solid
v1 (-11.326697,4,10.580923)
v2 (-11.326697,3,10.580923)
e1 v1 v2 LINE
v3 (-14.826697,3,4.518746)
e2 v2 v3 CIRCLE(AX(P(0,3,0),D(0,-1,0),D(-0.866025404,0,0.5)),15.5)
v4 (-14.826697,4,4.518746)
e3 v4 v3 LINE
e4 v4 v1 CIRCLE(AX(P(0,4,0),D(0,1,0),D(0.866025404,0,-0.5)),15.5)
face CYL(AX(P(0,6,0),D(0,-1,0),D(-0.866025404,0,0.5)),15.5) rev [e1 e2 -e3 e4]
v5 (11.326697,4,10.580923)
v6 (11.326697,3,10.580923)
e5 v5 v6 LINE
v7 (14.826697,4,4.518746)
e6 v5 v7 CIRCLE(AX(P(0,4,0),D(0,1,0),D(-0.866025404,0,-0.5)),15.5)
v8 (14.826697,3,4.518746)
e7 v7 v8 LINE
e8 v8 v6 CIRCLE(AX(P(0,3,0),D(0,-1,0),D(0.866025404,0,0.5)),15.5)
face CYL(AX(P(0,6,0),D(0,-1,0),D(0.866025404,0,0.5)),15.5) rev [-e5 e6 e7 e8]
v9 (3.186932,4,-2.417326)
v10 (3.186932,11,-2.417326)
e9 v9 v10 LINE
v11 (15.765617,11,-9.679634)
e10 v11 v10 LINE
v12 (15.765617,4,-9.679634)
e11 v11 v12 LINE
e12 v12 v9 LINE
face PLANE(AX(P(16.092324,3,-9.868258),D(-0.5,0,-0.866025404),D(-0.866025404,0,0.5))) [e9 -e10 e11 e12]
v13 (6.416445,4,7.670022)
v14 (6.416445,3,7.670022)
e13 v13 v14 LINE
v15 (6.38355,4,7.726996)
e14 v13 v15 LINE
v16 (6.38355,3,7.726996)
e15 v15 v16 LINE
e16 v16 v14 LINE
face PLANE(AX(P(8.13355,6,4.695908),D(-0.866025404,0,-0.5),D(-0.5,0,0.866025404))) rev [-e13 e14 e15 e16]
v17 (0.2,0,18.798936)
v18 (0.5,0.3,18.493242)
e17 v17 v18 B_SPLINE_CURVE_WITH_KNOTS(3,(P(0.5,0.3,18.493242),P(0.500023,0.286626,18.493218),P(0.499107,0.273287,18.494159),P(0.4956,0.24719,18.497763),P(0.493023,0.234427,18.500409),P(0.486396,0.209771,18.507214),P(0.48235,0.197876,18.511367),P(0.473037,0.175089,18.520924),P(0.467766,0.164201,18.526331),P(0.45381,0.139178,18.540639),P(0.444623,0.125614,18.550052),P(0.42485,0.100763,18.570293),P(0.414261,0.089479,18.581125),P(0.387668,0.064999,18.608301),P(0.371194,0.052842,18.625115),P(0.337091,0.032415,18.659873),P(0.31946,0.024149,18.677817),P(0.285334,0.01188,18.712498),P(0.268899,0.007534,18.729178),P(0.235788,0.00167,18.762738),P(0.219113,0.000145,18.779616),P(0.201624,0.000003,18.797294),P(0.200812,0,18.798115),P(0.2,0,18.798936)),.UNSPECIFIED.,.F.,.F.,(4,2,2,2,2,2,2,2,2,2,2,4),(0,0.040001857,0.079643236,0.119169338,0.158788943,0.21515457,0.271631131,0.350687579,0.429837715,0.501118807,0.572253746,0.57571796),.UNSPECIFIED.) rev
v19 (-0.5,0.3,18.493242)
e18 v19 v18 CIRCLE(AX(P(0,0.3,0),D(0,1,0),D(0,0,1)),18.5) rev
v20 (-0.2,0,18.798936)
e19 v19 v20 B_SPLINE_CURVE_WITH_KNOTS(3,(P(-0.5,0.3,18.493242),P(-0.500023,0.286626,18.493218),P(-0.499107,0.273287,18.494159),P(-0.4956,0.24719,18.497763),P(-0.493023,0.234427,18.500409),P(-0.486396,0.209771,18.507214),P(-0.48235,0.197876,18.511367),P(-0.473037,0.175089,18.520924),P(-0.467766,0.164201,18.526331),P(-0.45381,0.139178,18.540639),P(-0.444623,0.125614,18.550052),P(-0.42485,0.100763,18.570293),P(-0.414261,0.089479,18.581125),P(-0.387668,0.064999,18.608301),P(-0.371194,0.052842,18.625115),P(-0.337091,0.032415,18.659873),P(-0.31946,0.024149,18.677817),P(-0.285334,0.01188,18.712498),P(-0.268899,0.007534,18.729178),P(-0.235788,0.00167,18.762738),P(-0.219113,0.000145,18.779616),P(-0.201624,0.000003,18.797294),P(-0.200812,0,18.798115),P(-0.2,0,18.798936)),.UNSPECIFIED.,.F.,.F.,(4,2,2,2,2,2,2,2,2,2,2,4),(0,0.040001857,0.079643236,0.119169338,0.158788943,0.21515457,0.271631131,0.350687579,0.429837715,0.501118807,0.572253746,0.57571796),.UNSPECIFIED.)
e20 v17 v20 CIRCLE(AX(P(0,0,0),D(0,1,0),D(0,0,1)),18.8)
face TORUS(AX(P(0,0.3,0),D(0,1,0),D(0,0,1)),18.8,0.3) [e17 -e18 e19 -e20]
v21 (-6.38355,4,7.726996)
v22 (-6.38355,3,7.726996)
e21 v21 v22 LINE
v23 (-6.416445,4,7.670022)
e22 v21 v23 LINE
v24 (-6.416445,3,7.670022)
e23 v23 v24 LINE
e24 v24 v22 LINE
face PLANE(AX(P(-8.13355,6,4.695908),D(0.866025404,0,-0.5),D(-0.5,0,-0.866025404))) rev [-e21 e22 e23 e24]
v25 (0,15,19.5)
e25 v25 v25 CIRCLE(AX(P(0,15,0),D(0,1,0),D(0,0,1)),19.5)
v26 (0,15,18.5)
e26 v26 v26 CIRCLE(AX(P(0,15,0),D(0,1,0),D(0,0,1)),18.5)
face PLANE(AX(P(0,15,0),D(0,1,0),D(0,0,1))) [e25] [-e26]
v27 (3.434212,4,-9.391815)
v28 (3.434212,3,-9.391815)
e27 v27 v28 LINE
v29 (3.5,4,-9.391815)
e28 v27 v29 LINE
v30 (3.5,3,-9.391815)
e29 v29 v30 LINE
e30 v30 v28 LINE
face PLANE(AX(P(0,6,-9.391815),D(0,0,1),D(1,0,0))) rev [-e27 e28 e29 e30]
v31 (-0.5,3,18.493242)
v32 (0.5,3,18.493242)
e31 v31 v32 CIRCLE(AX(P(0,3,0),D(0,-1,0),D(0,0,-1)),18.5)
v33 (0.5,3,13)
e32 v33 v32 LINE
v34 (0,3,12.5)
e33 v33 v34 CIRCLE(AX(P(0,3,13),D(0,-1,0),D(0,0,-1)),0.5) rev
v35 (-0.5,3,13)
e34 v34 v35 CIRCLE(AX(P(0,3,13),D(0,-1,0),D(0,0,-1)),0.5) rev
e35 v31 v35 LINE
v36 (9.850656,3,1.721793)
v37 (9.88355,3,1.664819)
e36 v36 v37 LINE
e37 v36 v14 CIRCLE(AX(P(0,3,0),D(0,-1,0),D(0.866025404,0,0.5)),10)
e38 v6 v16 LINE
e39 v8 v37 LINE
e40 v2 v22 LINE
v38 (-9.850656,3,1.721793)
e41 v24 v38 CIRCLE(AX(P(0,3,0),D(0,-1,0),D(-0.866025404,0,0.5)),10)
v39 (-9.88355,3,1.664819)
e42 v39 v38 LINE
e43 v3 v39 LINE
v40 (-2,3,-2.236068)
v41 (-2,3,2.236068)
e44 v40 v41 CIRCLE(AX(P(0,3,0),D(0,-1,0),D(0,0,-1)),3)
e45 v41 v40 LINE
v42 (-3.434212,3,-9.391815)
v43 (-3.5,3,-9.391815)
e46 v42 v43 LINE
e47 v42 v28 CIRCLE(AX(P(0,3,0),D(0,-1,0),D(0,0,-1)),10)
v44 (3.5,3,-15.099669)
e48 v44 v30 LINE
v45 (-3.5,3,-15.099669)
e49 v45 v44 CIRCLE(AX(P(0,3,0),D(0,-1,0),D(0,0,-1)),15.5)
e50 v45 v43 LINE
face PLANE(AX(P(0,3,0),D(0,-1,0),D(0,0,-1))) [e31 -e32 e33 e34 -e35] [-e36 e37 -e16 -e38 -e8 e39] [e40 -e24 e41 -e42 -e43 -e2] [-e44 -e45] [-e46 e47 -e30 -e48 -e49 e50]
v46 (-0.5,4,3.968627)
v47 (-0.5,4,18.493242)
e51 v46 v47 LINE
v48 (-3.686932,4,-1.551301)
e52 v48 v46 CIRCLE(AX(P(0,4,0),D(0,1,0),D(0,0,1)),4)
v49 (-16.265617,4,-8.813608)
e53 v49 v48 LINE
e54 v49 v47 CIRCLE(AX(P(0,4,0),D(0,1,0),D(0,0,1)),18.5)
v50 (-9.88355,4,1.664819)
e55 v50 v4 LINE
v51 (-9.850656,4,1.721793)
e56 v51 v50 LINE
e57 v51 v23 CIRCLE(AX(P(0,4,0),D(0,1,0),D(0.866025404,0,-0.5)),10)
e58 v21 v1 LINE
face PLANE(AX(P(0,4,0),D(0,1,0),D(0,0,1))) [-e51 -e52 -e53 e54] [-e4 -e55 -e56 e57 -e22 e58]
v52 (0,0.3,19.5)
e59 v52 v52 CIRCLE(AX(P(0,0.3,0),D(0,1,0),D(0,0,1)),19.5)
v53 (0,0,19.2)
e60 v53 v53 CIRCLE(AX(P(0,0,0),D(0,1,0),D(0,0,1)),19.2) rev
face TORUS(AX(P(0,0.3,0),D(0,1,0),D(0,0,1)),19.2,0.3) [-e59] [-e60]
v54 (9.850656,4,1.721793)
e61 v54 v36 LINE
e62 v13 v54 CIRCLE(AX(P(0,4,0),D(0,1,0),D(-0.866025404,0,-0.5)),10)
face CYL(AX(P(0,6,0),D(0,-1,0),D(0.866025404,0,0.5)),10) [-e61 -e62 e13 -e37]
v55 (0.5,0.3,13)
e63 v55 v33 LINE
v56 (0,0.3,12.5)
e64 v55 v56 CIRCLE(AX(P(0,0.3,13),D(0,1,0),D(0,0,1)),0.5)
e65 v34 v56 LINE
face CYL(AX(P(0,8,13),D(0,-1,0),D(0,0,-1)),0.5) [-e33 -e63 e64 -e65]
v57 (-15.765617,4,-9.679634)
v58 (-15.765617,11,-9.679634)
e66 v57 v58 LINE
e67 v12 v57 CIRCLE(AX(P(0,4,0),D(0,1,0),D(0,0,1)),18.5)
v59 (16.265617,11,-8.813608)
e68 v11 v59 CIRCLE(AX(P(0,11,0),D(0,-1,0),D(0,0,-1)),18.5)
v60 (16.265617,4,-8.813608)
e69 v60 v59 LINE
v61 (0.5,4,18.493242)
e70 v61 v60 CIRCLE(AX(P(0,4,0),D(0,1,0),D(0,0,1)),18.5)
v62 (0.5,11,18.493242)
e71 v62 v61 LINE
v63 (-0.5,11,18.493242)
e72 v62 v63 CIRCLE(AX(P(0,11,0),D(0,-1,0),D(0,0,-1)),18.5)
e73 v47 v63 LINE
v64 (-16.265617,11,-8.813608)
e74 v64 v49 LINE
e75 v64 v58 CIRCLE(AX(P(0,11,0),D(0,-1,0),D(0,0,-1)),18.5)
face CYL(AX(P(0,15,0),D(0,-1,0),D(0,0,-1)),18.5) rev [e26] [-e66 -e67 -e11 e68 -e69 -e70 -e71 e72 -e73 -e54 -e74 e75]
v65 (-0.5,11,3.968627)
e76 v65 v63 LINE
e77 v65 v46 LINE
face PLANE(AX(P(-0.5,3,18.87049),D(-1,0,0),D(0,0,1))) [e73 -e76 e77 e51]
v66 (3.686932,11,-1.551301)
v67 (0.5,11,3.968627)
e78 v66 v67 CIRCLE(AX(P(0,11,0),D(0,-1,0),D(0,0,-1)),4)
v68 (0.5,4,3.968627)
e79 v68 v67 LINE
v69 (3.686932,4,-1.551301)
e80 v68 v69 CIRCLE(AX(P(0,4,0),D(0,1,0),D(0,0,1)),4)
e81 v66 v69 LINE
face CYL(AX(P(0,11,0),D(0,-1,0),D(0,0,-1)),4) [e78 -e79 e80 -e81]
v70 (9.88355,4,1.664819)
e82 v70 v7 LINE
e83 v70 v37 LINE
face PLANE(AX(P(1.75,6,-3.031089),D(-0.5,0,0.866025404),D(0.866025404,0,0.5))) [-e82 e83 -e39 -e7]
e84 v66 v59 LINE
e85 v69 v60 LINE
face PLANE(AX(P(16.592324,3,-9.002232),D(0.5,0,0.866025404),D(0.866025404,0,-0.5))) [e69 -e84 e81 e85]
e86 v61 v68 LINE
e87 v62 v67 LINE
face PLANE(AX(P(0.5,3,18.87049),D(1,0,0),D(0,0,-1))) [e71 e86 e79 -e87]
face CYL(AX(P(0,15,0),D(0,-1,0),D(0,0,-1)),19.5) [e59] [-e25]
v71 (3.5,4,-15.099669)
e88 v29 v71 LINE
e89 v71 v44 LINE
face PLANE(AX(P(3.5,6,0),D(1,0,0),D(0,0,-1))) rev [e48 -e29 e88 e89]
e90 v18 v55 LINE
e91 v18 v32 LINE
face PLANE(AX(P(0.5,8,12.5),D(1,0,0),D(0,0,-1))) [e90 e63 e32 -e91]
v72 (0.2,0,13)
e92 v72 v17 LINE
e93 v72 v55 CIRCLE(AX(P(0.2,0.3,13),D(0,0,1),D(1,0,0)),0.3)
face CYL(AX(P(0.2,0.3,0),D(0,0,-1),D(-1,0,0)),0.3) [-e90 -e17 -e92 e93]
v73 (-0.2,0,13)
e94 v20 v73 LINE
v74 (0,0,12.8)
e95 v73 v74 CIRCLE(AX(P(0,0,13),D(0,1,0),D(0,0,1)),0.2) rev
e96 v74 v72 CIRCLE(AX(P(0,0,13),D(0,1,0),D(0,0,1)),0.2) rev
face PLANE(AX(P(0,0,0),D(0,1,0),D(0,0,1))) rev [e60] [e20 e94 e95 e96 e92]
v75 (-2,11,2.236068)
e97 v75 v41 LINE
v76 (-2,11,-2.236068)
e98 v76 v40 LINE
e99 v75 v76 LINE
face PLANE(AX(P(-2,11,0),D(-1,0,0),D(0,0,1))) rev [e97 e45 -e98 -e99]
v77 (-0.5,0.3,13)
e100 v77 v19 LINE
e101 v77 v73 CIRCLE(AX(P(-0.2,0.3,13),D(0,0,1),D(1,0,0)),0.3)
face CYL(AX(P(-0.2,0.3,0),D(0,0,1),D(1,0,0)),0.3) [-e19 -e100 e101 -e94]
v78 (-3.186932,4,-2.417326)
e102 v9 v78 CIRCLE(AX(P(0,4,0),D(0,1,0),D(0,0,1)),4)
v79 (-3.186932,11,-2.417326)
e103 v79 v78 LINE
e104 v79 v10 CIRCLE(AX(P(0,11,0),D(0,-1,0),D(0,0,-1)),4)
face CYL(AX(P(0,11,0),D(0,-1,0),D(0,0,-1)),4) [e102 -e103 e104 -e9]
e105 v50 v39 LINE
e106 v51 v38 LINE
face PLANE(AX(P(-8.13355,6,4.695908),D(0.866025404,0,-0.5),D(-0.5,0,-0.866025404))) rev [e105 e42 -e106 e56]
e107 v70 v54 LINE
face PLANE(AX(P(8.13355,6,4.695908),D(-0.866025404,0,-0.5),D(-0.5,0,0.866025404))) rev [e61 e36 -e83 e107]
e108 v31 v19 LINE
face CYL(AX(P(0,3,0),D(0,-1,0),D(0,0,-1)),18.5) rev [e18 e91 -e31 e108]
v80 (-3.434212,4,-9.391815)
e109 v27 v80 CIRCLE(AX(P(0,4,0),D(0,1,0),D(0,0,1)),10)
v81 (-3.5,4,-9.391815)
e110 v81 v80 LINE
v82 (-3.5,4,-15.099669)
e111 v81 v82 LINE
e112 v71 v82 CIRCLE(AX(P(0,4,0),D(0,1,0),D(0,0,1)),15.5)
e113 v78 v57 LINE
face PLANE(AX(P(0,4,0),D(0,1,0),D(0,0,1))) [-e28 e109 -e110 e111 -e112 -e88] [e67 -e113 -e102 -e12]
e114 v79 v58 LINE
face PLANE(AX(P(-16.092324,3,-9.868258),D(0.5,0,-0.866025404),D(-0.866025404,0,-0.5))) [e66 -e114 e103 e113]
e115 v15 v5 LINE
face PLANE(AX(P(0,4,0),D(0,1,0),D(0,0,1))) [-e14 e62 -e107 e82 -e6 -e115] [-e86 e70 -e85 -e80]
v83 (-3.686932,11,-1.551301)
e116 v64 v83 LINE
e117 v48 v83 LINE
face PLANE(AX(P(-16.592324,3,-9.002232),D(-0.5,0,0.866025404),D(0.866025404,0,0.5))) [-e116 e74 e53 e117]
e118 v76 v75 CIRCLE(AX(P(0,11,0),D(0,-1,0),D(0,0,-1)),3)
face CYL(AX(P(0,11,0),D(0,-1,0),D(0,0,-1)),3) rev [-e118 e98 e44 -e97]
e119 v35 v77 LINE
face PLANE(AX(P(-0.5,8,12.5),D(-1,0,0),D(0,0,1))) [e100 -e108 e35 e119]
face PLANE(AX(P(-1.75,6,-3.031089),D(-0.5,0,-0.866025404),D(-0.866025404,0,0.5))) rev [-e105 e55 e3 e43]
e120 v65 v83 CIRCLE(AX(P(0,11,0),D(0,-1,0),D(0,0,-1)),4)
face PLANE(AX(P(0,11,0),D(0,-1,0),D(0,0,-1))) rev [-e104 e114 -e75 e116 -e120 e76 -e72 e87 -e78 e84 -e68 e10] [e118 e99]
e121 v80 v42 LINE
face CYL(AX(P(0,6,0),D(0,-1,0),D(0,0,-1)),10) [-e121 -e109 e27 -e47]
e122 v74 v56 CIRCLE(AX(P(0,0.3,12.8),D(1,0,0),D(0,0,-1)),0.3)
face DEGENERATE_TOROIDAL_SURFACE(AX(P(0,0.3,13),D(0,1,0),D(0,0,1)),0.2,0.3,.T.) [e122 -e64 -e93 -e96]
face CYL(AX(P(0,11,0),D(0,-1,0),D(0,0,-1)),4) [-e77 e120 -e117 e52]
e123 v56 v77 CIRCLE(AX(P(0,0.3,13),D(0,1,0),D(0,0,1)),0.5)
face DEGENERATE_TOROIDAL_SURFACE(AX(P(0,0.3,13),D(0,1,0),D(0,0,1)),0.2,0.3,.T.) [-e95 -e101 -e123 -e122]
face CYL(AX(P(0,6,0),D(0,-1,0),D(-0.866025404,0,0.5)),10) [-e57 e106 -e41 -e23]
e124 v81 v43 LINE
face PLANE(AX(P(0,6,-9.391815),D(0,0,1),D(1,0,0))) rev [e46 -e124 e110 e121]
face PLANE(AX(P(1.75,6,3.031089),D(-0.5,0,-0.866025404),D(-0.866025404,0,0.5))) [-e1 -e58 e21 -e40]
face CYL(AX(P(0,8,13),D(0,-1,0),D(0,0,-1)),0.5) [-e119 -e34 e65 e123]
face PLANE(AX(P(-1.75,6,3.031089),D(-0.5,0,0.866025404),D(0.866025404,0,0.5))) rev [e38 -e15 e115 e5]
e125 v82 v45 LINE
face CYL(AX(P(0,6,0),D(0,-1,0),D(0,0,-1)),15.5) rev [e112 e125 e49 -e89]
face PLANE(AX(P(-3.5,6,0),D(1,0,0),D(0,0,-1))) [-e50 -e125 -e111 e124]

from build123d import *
from build123d.topology import SkipClean

# Parameters (mm, degrees)
SKETCH1_R            = 19.5
SKETCH1_R_2          = 18.5
BOSS_EXTRUDE1_DEPTH  = 15
SKETCH2_R            = 18.5
BOSS_EXTRUDE2_DEPTH  = 4
SKETCH3_R            = 18.5
CUT_EXTRUDE1_DEPTH   = 3
CUT_EXTRUDE2_DEPTH   = 3
CIRPATTERN1_COUNT    = 3
SKETCH8_R            = 4
BOSS_EXTRUDE28_DEPTH = 8
CUT_EXTRUDE3_DEPTH   = 8
SKETCH11_W           = 1
SKETCH11_H           = 15.24098
BOSS_EXTRUDE29_DEPTH = 8
CIRPATTERN5_COUNT    = 3
SKETCH12_W           = 1
SKETCH12_H           = 6.224425
BOSS_EXTRUDE30_DEPTH = 8
FILLET7_R            = 0.5
FILLET8_R            = 0.3


with BuildPart() as part:
    # Sketch1 → Boss-Extrude1 (new body)
    with BuildSketch(Plane(origin=(0, 0, 0), x_dir=(1, 0, 0), z_dir=(0, 1, 0))):
        with Locations(Location((0, 0, 0), (0, 0, 270))):
            Circle(SKETCH1_R)
        with Locations(Location((0, 0, 0), (0, 0, 270))):
            Circle(SKETCH1_R_2, mode=Mode.SUBTRACT)
    extrude(amount=BOSS_EXTRUDE1_DEPTH)

    # Sketch2 → Boss-Extrude2 (add)
    with BuildSketch(Plane(origin=(0, 0, 0), x_dir=(1, 0, 0), z_dir=(0, 1, 0))):
        with Locations(Location((0, 0, 0), (0, 0, 270))):
            Circle(SKETCH2_R)
    extrude(amount=BOSS_EXTRUDE2_DEPTH)

    # Sketch3 → Cut-Extrude1 (cut)
    with BuildSketch(Plane(origin=(0, 0, 0), x_dir=(-1, 0, 0), z_dir=(0, -1, 0))):
        with Locations(Location((0, 0, 0), (0, 0, 270))):
            Circle(SKETCH3_R)
    extrude(amount=-CUT_EXTRUDE1_DEPTH, mode=Mode.SUBTRACT)

    # Sketch6 → Cut-Extrude2 (cut)
    with BuildSketch(Plane(origin=(0, 3, 0), x_dir=(-1, 0, 0), z_dir=(0, -1, 0))):
        with BuildLine():
            ThreePointArc((-3.434212, 9.391815), (-1.743825, 9.84678), (0, 10))
            Line((0, 10), (0, 15.5))
            ThreePointArc((0, 15.5), (-1.76141, 15.399592), (-3.5, 15.099669))
            Line((-3.5, 15.099669), (-3.5, 9.391815))
            Line((-3.5, 9.391815), (-3.434212, 9.391815))
        make_face()
        with BuildLine():
            Line((0, 15.5), (0, 10))
            ThreePointArc((0, 10), (1.743825, 9.84678), (3.434212, 9.391815))
            Line((3.434212, 9.391815), (3.5, 9.391815))
            Line((3.5, 9.391815), (3.5, 15.099669))
            ThreePointArc((3.5, 15.099669), (1.76141, 15.399592), (0, 15.5))
        make_face()
    cut_extrude2 = extrude(amount=-CUT_EXTRUDE2_DEPTH, mode=Mode.SUBTRACT)

    # CirPattern1: Cut-Extrude2 ×3 about axis
    cirpattern1_axis = Axis((0, 0, 0), (0, 1, 0))
    for i in range(1, CIRPATTERN1_COUNT):
        add(cut_extrude2.rotate(cirpattern1_axis, i * 360 / CIRPATTERN1_COUNT), mode=Mode.SUBTRACT)

    # Sketch8 → Boss-Extrude28 (add)
    with BuildSketch(Plane.XZ.offset(-3)):
        with Locations(Location((0, 0, 0), (0, 0, 270))):
            Circle(SKETCH8_R)
        with BuildLine():
            Line((-2, -2.236068), (-2, 2.236068))
            ThreePointArc((-2, 2.236068), (3, 0), (-2, -2.236068))
        make_face(mode=Mode.SUBTRACT)
    extrude(amount=-BOSS_EXTRUDE28_DEPTH)

    # Sketch8<3> → Cut-Extrude3 (cut)
    with SkipClean():  # the faces are left unmerged after this step: merging them gives an invalid solid
        with BuildSketch(Plane.XZ.offset(-3)):
            with BuildLine():
                ThreePointArc((3, 0), (1.224745, 2.738613), (-2, 2.236068))
                Line((-2, 2.236068), (-2, -2.236068))
                ThreePointArc((-2, -2.236068), (1.224745, -2.738613), (3, 0))
            make_face()
        extrude(amount=-CUT_EXTRUDE3_DEPTH, mode=Mode.SUBTRACT)

    # Sketch11 → Boss-Extrude29 (add)
    with SkipClean():  # the faces are left unmerged after this step: merging them gives an invalid solid
        with BuildSketch(Plane(origin=(0, 11, 0), x_dir=(1, 0, 0), z_dir=(0, 1, 0))):
            with Locations((0, -11.25)):
                Rectangle(SKETCH11_W, SKETCH11_H)
        boss_extrude29 = extrude(amount=-BOSS_EXTRUDE29_DEPTH)

    # CirPattern5: Boss-Extrude29 ×3 about axis
    with SkipClean():  # the faces are left unmerged after this step: merging them gives an invalid solid
        cirpattern5_axis = Axis((0, 0, 0), (0, 1, 0))
        for i in range(1, CIRPATTERN5_COUNT):
            add(boss_extrude29.rotate(cirpattern5_axis, i * 360 / CIRPATTERN5_COUNT))

    # Sketch12 → Boss-Extrude30 (add)
    with SkipClean():  # the faces are left unmerged after this step: merging them gives an invalid solid
        with BuildSketch(Plane.XZ):
            with Locations((0, 15.612213)):
                Rectangle(SKETCH12_W, SKETCH12_H)
        extrude(amount=-BOSS_EXTRUDE30_DEPTH)

    # Fillet7
    fillet7_edges = [part.edges().sort_by_distance(p)[0] for p in [
        (-0.5, 1.5, 12.5),
        (0.5, 1.5, 12.5),
    ]]
    fillet(fillet7_edges, radius=FILLET7_R - 0.0001)  # a hair under: the kernel refuses the full size

    # Fillet8
    fillet8_edges = [part.edges().sort_by_distance(p)[0] for p in [
        (0, 0, -19.5),
        (0, 0, -18.5),
        (-0.5, 0, 15.746571),
        (0.5, 0, 15.746571),
        (0.353583, 0, 12.646417),
        (-0.353583, 0, 12.646417),
    ]]
    fillet(fillet8_edges, radius=FILLET8_R)


solid = part.part
